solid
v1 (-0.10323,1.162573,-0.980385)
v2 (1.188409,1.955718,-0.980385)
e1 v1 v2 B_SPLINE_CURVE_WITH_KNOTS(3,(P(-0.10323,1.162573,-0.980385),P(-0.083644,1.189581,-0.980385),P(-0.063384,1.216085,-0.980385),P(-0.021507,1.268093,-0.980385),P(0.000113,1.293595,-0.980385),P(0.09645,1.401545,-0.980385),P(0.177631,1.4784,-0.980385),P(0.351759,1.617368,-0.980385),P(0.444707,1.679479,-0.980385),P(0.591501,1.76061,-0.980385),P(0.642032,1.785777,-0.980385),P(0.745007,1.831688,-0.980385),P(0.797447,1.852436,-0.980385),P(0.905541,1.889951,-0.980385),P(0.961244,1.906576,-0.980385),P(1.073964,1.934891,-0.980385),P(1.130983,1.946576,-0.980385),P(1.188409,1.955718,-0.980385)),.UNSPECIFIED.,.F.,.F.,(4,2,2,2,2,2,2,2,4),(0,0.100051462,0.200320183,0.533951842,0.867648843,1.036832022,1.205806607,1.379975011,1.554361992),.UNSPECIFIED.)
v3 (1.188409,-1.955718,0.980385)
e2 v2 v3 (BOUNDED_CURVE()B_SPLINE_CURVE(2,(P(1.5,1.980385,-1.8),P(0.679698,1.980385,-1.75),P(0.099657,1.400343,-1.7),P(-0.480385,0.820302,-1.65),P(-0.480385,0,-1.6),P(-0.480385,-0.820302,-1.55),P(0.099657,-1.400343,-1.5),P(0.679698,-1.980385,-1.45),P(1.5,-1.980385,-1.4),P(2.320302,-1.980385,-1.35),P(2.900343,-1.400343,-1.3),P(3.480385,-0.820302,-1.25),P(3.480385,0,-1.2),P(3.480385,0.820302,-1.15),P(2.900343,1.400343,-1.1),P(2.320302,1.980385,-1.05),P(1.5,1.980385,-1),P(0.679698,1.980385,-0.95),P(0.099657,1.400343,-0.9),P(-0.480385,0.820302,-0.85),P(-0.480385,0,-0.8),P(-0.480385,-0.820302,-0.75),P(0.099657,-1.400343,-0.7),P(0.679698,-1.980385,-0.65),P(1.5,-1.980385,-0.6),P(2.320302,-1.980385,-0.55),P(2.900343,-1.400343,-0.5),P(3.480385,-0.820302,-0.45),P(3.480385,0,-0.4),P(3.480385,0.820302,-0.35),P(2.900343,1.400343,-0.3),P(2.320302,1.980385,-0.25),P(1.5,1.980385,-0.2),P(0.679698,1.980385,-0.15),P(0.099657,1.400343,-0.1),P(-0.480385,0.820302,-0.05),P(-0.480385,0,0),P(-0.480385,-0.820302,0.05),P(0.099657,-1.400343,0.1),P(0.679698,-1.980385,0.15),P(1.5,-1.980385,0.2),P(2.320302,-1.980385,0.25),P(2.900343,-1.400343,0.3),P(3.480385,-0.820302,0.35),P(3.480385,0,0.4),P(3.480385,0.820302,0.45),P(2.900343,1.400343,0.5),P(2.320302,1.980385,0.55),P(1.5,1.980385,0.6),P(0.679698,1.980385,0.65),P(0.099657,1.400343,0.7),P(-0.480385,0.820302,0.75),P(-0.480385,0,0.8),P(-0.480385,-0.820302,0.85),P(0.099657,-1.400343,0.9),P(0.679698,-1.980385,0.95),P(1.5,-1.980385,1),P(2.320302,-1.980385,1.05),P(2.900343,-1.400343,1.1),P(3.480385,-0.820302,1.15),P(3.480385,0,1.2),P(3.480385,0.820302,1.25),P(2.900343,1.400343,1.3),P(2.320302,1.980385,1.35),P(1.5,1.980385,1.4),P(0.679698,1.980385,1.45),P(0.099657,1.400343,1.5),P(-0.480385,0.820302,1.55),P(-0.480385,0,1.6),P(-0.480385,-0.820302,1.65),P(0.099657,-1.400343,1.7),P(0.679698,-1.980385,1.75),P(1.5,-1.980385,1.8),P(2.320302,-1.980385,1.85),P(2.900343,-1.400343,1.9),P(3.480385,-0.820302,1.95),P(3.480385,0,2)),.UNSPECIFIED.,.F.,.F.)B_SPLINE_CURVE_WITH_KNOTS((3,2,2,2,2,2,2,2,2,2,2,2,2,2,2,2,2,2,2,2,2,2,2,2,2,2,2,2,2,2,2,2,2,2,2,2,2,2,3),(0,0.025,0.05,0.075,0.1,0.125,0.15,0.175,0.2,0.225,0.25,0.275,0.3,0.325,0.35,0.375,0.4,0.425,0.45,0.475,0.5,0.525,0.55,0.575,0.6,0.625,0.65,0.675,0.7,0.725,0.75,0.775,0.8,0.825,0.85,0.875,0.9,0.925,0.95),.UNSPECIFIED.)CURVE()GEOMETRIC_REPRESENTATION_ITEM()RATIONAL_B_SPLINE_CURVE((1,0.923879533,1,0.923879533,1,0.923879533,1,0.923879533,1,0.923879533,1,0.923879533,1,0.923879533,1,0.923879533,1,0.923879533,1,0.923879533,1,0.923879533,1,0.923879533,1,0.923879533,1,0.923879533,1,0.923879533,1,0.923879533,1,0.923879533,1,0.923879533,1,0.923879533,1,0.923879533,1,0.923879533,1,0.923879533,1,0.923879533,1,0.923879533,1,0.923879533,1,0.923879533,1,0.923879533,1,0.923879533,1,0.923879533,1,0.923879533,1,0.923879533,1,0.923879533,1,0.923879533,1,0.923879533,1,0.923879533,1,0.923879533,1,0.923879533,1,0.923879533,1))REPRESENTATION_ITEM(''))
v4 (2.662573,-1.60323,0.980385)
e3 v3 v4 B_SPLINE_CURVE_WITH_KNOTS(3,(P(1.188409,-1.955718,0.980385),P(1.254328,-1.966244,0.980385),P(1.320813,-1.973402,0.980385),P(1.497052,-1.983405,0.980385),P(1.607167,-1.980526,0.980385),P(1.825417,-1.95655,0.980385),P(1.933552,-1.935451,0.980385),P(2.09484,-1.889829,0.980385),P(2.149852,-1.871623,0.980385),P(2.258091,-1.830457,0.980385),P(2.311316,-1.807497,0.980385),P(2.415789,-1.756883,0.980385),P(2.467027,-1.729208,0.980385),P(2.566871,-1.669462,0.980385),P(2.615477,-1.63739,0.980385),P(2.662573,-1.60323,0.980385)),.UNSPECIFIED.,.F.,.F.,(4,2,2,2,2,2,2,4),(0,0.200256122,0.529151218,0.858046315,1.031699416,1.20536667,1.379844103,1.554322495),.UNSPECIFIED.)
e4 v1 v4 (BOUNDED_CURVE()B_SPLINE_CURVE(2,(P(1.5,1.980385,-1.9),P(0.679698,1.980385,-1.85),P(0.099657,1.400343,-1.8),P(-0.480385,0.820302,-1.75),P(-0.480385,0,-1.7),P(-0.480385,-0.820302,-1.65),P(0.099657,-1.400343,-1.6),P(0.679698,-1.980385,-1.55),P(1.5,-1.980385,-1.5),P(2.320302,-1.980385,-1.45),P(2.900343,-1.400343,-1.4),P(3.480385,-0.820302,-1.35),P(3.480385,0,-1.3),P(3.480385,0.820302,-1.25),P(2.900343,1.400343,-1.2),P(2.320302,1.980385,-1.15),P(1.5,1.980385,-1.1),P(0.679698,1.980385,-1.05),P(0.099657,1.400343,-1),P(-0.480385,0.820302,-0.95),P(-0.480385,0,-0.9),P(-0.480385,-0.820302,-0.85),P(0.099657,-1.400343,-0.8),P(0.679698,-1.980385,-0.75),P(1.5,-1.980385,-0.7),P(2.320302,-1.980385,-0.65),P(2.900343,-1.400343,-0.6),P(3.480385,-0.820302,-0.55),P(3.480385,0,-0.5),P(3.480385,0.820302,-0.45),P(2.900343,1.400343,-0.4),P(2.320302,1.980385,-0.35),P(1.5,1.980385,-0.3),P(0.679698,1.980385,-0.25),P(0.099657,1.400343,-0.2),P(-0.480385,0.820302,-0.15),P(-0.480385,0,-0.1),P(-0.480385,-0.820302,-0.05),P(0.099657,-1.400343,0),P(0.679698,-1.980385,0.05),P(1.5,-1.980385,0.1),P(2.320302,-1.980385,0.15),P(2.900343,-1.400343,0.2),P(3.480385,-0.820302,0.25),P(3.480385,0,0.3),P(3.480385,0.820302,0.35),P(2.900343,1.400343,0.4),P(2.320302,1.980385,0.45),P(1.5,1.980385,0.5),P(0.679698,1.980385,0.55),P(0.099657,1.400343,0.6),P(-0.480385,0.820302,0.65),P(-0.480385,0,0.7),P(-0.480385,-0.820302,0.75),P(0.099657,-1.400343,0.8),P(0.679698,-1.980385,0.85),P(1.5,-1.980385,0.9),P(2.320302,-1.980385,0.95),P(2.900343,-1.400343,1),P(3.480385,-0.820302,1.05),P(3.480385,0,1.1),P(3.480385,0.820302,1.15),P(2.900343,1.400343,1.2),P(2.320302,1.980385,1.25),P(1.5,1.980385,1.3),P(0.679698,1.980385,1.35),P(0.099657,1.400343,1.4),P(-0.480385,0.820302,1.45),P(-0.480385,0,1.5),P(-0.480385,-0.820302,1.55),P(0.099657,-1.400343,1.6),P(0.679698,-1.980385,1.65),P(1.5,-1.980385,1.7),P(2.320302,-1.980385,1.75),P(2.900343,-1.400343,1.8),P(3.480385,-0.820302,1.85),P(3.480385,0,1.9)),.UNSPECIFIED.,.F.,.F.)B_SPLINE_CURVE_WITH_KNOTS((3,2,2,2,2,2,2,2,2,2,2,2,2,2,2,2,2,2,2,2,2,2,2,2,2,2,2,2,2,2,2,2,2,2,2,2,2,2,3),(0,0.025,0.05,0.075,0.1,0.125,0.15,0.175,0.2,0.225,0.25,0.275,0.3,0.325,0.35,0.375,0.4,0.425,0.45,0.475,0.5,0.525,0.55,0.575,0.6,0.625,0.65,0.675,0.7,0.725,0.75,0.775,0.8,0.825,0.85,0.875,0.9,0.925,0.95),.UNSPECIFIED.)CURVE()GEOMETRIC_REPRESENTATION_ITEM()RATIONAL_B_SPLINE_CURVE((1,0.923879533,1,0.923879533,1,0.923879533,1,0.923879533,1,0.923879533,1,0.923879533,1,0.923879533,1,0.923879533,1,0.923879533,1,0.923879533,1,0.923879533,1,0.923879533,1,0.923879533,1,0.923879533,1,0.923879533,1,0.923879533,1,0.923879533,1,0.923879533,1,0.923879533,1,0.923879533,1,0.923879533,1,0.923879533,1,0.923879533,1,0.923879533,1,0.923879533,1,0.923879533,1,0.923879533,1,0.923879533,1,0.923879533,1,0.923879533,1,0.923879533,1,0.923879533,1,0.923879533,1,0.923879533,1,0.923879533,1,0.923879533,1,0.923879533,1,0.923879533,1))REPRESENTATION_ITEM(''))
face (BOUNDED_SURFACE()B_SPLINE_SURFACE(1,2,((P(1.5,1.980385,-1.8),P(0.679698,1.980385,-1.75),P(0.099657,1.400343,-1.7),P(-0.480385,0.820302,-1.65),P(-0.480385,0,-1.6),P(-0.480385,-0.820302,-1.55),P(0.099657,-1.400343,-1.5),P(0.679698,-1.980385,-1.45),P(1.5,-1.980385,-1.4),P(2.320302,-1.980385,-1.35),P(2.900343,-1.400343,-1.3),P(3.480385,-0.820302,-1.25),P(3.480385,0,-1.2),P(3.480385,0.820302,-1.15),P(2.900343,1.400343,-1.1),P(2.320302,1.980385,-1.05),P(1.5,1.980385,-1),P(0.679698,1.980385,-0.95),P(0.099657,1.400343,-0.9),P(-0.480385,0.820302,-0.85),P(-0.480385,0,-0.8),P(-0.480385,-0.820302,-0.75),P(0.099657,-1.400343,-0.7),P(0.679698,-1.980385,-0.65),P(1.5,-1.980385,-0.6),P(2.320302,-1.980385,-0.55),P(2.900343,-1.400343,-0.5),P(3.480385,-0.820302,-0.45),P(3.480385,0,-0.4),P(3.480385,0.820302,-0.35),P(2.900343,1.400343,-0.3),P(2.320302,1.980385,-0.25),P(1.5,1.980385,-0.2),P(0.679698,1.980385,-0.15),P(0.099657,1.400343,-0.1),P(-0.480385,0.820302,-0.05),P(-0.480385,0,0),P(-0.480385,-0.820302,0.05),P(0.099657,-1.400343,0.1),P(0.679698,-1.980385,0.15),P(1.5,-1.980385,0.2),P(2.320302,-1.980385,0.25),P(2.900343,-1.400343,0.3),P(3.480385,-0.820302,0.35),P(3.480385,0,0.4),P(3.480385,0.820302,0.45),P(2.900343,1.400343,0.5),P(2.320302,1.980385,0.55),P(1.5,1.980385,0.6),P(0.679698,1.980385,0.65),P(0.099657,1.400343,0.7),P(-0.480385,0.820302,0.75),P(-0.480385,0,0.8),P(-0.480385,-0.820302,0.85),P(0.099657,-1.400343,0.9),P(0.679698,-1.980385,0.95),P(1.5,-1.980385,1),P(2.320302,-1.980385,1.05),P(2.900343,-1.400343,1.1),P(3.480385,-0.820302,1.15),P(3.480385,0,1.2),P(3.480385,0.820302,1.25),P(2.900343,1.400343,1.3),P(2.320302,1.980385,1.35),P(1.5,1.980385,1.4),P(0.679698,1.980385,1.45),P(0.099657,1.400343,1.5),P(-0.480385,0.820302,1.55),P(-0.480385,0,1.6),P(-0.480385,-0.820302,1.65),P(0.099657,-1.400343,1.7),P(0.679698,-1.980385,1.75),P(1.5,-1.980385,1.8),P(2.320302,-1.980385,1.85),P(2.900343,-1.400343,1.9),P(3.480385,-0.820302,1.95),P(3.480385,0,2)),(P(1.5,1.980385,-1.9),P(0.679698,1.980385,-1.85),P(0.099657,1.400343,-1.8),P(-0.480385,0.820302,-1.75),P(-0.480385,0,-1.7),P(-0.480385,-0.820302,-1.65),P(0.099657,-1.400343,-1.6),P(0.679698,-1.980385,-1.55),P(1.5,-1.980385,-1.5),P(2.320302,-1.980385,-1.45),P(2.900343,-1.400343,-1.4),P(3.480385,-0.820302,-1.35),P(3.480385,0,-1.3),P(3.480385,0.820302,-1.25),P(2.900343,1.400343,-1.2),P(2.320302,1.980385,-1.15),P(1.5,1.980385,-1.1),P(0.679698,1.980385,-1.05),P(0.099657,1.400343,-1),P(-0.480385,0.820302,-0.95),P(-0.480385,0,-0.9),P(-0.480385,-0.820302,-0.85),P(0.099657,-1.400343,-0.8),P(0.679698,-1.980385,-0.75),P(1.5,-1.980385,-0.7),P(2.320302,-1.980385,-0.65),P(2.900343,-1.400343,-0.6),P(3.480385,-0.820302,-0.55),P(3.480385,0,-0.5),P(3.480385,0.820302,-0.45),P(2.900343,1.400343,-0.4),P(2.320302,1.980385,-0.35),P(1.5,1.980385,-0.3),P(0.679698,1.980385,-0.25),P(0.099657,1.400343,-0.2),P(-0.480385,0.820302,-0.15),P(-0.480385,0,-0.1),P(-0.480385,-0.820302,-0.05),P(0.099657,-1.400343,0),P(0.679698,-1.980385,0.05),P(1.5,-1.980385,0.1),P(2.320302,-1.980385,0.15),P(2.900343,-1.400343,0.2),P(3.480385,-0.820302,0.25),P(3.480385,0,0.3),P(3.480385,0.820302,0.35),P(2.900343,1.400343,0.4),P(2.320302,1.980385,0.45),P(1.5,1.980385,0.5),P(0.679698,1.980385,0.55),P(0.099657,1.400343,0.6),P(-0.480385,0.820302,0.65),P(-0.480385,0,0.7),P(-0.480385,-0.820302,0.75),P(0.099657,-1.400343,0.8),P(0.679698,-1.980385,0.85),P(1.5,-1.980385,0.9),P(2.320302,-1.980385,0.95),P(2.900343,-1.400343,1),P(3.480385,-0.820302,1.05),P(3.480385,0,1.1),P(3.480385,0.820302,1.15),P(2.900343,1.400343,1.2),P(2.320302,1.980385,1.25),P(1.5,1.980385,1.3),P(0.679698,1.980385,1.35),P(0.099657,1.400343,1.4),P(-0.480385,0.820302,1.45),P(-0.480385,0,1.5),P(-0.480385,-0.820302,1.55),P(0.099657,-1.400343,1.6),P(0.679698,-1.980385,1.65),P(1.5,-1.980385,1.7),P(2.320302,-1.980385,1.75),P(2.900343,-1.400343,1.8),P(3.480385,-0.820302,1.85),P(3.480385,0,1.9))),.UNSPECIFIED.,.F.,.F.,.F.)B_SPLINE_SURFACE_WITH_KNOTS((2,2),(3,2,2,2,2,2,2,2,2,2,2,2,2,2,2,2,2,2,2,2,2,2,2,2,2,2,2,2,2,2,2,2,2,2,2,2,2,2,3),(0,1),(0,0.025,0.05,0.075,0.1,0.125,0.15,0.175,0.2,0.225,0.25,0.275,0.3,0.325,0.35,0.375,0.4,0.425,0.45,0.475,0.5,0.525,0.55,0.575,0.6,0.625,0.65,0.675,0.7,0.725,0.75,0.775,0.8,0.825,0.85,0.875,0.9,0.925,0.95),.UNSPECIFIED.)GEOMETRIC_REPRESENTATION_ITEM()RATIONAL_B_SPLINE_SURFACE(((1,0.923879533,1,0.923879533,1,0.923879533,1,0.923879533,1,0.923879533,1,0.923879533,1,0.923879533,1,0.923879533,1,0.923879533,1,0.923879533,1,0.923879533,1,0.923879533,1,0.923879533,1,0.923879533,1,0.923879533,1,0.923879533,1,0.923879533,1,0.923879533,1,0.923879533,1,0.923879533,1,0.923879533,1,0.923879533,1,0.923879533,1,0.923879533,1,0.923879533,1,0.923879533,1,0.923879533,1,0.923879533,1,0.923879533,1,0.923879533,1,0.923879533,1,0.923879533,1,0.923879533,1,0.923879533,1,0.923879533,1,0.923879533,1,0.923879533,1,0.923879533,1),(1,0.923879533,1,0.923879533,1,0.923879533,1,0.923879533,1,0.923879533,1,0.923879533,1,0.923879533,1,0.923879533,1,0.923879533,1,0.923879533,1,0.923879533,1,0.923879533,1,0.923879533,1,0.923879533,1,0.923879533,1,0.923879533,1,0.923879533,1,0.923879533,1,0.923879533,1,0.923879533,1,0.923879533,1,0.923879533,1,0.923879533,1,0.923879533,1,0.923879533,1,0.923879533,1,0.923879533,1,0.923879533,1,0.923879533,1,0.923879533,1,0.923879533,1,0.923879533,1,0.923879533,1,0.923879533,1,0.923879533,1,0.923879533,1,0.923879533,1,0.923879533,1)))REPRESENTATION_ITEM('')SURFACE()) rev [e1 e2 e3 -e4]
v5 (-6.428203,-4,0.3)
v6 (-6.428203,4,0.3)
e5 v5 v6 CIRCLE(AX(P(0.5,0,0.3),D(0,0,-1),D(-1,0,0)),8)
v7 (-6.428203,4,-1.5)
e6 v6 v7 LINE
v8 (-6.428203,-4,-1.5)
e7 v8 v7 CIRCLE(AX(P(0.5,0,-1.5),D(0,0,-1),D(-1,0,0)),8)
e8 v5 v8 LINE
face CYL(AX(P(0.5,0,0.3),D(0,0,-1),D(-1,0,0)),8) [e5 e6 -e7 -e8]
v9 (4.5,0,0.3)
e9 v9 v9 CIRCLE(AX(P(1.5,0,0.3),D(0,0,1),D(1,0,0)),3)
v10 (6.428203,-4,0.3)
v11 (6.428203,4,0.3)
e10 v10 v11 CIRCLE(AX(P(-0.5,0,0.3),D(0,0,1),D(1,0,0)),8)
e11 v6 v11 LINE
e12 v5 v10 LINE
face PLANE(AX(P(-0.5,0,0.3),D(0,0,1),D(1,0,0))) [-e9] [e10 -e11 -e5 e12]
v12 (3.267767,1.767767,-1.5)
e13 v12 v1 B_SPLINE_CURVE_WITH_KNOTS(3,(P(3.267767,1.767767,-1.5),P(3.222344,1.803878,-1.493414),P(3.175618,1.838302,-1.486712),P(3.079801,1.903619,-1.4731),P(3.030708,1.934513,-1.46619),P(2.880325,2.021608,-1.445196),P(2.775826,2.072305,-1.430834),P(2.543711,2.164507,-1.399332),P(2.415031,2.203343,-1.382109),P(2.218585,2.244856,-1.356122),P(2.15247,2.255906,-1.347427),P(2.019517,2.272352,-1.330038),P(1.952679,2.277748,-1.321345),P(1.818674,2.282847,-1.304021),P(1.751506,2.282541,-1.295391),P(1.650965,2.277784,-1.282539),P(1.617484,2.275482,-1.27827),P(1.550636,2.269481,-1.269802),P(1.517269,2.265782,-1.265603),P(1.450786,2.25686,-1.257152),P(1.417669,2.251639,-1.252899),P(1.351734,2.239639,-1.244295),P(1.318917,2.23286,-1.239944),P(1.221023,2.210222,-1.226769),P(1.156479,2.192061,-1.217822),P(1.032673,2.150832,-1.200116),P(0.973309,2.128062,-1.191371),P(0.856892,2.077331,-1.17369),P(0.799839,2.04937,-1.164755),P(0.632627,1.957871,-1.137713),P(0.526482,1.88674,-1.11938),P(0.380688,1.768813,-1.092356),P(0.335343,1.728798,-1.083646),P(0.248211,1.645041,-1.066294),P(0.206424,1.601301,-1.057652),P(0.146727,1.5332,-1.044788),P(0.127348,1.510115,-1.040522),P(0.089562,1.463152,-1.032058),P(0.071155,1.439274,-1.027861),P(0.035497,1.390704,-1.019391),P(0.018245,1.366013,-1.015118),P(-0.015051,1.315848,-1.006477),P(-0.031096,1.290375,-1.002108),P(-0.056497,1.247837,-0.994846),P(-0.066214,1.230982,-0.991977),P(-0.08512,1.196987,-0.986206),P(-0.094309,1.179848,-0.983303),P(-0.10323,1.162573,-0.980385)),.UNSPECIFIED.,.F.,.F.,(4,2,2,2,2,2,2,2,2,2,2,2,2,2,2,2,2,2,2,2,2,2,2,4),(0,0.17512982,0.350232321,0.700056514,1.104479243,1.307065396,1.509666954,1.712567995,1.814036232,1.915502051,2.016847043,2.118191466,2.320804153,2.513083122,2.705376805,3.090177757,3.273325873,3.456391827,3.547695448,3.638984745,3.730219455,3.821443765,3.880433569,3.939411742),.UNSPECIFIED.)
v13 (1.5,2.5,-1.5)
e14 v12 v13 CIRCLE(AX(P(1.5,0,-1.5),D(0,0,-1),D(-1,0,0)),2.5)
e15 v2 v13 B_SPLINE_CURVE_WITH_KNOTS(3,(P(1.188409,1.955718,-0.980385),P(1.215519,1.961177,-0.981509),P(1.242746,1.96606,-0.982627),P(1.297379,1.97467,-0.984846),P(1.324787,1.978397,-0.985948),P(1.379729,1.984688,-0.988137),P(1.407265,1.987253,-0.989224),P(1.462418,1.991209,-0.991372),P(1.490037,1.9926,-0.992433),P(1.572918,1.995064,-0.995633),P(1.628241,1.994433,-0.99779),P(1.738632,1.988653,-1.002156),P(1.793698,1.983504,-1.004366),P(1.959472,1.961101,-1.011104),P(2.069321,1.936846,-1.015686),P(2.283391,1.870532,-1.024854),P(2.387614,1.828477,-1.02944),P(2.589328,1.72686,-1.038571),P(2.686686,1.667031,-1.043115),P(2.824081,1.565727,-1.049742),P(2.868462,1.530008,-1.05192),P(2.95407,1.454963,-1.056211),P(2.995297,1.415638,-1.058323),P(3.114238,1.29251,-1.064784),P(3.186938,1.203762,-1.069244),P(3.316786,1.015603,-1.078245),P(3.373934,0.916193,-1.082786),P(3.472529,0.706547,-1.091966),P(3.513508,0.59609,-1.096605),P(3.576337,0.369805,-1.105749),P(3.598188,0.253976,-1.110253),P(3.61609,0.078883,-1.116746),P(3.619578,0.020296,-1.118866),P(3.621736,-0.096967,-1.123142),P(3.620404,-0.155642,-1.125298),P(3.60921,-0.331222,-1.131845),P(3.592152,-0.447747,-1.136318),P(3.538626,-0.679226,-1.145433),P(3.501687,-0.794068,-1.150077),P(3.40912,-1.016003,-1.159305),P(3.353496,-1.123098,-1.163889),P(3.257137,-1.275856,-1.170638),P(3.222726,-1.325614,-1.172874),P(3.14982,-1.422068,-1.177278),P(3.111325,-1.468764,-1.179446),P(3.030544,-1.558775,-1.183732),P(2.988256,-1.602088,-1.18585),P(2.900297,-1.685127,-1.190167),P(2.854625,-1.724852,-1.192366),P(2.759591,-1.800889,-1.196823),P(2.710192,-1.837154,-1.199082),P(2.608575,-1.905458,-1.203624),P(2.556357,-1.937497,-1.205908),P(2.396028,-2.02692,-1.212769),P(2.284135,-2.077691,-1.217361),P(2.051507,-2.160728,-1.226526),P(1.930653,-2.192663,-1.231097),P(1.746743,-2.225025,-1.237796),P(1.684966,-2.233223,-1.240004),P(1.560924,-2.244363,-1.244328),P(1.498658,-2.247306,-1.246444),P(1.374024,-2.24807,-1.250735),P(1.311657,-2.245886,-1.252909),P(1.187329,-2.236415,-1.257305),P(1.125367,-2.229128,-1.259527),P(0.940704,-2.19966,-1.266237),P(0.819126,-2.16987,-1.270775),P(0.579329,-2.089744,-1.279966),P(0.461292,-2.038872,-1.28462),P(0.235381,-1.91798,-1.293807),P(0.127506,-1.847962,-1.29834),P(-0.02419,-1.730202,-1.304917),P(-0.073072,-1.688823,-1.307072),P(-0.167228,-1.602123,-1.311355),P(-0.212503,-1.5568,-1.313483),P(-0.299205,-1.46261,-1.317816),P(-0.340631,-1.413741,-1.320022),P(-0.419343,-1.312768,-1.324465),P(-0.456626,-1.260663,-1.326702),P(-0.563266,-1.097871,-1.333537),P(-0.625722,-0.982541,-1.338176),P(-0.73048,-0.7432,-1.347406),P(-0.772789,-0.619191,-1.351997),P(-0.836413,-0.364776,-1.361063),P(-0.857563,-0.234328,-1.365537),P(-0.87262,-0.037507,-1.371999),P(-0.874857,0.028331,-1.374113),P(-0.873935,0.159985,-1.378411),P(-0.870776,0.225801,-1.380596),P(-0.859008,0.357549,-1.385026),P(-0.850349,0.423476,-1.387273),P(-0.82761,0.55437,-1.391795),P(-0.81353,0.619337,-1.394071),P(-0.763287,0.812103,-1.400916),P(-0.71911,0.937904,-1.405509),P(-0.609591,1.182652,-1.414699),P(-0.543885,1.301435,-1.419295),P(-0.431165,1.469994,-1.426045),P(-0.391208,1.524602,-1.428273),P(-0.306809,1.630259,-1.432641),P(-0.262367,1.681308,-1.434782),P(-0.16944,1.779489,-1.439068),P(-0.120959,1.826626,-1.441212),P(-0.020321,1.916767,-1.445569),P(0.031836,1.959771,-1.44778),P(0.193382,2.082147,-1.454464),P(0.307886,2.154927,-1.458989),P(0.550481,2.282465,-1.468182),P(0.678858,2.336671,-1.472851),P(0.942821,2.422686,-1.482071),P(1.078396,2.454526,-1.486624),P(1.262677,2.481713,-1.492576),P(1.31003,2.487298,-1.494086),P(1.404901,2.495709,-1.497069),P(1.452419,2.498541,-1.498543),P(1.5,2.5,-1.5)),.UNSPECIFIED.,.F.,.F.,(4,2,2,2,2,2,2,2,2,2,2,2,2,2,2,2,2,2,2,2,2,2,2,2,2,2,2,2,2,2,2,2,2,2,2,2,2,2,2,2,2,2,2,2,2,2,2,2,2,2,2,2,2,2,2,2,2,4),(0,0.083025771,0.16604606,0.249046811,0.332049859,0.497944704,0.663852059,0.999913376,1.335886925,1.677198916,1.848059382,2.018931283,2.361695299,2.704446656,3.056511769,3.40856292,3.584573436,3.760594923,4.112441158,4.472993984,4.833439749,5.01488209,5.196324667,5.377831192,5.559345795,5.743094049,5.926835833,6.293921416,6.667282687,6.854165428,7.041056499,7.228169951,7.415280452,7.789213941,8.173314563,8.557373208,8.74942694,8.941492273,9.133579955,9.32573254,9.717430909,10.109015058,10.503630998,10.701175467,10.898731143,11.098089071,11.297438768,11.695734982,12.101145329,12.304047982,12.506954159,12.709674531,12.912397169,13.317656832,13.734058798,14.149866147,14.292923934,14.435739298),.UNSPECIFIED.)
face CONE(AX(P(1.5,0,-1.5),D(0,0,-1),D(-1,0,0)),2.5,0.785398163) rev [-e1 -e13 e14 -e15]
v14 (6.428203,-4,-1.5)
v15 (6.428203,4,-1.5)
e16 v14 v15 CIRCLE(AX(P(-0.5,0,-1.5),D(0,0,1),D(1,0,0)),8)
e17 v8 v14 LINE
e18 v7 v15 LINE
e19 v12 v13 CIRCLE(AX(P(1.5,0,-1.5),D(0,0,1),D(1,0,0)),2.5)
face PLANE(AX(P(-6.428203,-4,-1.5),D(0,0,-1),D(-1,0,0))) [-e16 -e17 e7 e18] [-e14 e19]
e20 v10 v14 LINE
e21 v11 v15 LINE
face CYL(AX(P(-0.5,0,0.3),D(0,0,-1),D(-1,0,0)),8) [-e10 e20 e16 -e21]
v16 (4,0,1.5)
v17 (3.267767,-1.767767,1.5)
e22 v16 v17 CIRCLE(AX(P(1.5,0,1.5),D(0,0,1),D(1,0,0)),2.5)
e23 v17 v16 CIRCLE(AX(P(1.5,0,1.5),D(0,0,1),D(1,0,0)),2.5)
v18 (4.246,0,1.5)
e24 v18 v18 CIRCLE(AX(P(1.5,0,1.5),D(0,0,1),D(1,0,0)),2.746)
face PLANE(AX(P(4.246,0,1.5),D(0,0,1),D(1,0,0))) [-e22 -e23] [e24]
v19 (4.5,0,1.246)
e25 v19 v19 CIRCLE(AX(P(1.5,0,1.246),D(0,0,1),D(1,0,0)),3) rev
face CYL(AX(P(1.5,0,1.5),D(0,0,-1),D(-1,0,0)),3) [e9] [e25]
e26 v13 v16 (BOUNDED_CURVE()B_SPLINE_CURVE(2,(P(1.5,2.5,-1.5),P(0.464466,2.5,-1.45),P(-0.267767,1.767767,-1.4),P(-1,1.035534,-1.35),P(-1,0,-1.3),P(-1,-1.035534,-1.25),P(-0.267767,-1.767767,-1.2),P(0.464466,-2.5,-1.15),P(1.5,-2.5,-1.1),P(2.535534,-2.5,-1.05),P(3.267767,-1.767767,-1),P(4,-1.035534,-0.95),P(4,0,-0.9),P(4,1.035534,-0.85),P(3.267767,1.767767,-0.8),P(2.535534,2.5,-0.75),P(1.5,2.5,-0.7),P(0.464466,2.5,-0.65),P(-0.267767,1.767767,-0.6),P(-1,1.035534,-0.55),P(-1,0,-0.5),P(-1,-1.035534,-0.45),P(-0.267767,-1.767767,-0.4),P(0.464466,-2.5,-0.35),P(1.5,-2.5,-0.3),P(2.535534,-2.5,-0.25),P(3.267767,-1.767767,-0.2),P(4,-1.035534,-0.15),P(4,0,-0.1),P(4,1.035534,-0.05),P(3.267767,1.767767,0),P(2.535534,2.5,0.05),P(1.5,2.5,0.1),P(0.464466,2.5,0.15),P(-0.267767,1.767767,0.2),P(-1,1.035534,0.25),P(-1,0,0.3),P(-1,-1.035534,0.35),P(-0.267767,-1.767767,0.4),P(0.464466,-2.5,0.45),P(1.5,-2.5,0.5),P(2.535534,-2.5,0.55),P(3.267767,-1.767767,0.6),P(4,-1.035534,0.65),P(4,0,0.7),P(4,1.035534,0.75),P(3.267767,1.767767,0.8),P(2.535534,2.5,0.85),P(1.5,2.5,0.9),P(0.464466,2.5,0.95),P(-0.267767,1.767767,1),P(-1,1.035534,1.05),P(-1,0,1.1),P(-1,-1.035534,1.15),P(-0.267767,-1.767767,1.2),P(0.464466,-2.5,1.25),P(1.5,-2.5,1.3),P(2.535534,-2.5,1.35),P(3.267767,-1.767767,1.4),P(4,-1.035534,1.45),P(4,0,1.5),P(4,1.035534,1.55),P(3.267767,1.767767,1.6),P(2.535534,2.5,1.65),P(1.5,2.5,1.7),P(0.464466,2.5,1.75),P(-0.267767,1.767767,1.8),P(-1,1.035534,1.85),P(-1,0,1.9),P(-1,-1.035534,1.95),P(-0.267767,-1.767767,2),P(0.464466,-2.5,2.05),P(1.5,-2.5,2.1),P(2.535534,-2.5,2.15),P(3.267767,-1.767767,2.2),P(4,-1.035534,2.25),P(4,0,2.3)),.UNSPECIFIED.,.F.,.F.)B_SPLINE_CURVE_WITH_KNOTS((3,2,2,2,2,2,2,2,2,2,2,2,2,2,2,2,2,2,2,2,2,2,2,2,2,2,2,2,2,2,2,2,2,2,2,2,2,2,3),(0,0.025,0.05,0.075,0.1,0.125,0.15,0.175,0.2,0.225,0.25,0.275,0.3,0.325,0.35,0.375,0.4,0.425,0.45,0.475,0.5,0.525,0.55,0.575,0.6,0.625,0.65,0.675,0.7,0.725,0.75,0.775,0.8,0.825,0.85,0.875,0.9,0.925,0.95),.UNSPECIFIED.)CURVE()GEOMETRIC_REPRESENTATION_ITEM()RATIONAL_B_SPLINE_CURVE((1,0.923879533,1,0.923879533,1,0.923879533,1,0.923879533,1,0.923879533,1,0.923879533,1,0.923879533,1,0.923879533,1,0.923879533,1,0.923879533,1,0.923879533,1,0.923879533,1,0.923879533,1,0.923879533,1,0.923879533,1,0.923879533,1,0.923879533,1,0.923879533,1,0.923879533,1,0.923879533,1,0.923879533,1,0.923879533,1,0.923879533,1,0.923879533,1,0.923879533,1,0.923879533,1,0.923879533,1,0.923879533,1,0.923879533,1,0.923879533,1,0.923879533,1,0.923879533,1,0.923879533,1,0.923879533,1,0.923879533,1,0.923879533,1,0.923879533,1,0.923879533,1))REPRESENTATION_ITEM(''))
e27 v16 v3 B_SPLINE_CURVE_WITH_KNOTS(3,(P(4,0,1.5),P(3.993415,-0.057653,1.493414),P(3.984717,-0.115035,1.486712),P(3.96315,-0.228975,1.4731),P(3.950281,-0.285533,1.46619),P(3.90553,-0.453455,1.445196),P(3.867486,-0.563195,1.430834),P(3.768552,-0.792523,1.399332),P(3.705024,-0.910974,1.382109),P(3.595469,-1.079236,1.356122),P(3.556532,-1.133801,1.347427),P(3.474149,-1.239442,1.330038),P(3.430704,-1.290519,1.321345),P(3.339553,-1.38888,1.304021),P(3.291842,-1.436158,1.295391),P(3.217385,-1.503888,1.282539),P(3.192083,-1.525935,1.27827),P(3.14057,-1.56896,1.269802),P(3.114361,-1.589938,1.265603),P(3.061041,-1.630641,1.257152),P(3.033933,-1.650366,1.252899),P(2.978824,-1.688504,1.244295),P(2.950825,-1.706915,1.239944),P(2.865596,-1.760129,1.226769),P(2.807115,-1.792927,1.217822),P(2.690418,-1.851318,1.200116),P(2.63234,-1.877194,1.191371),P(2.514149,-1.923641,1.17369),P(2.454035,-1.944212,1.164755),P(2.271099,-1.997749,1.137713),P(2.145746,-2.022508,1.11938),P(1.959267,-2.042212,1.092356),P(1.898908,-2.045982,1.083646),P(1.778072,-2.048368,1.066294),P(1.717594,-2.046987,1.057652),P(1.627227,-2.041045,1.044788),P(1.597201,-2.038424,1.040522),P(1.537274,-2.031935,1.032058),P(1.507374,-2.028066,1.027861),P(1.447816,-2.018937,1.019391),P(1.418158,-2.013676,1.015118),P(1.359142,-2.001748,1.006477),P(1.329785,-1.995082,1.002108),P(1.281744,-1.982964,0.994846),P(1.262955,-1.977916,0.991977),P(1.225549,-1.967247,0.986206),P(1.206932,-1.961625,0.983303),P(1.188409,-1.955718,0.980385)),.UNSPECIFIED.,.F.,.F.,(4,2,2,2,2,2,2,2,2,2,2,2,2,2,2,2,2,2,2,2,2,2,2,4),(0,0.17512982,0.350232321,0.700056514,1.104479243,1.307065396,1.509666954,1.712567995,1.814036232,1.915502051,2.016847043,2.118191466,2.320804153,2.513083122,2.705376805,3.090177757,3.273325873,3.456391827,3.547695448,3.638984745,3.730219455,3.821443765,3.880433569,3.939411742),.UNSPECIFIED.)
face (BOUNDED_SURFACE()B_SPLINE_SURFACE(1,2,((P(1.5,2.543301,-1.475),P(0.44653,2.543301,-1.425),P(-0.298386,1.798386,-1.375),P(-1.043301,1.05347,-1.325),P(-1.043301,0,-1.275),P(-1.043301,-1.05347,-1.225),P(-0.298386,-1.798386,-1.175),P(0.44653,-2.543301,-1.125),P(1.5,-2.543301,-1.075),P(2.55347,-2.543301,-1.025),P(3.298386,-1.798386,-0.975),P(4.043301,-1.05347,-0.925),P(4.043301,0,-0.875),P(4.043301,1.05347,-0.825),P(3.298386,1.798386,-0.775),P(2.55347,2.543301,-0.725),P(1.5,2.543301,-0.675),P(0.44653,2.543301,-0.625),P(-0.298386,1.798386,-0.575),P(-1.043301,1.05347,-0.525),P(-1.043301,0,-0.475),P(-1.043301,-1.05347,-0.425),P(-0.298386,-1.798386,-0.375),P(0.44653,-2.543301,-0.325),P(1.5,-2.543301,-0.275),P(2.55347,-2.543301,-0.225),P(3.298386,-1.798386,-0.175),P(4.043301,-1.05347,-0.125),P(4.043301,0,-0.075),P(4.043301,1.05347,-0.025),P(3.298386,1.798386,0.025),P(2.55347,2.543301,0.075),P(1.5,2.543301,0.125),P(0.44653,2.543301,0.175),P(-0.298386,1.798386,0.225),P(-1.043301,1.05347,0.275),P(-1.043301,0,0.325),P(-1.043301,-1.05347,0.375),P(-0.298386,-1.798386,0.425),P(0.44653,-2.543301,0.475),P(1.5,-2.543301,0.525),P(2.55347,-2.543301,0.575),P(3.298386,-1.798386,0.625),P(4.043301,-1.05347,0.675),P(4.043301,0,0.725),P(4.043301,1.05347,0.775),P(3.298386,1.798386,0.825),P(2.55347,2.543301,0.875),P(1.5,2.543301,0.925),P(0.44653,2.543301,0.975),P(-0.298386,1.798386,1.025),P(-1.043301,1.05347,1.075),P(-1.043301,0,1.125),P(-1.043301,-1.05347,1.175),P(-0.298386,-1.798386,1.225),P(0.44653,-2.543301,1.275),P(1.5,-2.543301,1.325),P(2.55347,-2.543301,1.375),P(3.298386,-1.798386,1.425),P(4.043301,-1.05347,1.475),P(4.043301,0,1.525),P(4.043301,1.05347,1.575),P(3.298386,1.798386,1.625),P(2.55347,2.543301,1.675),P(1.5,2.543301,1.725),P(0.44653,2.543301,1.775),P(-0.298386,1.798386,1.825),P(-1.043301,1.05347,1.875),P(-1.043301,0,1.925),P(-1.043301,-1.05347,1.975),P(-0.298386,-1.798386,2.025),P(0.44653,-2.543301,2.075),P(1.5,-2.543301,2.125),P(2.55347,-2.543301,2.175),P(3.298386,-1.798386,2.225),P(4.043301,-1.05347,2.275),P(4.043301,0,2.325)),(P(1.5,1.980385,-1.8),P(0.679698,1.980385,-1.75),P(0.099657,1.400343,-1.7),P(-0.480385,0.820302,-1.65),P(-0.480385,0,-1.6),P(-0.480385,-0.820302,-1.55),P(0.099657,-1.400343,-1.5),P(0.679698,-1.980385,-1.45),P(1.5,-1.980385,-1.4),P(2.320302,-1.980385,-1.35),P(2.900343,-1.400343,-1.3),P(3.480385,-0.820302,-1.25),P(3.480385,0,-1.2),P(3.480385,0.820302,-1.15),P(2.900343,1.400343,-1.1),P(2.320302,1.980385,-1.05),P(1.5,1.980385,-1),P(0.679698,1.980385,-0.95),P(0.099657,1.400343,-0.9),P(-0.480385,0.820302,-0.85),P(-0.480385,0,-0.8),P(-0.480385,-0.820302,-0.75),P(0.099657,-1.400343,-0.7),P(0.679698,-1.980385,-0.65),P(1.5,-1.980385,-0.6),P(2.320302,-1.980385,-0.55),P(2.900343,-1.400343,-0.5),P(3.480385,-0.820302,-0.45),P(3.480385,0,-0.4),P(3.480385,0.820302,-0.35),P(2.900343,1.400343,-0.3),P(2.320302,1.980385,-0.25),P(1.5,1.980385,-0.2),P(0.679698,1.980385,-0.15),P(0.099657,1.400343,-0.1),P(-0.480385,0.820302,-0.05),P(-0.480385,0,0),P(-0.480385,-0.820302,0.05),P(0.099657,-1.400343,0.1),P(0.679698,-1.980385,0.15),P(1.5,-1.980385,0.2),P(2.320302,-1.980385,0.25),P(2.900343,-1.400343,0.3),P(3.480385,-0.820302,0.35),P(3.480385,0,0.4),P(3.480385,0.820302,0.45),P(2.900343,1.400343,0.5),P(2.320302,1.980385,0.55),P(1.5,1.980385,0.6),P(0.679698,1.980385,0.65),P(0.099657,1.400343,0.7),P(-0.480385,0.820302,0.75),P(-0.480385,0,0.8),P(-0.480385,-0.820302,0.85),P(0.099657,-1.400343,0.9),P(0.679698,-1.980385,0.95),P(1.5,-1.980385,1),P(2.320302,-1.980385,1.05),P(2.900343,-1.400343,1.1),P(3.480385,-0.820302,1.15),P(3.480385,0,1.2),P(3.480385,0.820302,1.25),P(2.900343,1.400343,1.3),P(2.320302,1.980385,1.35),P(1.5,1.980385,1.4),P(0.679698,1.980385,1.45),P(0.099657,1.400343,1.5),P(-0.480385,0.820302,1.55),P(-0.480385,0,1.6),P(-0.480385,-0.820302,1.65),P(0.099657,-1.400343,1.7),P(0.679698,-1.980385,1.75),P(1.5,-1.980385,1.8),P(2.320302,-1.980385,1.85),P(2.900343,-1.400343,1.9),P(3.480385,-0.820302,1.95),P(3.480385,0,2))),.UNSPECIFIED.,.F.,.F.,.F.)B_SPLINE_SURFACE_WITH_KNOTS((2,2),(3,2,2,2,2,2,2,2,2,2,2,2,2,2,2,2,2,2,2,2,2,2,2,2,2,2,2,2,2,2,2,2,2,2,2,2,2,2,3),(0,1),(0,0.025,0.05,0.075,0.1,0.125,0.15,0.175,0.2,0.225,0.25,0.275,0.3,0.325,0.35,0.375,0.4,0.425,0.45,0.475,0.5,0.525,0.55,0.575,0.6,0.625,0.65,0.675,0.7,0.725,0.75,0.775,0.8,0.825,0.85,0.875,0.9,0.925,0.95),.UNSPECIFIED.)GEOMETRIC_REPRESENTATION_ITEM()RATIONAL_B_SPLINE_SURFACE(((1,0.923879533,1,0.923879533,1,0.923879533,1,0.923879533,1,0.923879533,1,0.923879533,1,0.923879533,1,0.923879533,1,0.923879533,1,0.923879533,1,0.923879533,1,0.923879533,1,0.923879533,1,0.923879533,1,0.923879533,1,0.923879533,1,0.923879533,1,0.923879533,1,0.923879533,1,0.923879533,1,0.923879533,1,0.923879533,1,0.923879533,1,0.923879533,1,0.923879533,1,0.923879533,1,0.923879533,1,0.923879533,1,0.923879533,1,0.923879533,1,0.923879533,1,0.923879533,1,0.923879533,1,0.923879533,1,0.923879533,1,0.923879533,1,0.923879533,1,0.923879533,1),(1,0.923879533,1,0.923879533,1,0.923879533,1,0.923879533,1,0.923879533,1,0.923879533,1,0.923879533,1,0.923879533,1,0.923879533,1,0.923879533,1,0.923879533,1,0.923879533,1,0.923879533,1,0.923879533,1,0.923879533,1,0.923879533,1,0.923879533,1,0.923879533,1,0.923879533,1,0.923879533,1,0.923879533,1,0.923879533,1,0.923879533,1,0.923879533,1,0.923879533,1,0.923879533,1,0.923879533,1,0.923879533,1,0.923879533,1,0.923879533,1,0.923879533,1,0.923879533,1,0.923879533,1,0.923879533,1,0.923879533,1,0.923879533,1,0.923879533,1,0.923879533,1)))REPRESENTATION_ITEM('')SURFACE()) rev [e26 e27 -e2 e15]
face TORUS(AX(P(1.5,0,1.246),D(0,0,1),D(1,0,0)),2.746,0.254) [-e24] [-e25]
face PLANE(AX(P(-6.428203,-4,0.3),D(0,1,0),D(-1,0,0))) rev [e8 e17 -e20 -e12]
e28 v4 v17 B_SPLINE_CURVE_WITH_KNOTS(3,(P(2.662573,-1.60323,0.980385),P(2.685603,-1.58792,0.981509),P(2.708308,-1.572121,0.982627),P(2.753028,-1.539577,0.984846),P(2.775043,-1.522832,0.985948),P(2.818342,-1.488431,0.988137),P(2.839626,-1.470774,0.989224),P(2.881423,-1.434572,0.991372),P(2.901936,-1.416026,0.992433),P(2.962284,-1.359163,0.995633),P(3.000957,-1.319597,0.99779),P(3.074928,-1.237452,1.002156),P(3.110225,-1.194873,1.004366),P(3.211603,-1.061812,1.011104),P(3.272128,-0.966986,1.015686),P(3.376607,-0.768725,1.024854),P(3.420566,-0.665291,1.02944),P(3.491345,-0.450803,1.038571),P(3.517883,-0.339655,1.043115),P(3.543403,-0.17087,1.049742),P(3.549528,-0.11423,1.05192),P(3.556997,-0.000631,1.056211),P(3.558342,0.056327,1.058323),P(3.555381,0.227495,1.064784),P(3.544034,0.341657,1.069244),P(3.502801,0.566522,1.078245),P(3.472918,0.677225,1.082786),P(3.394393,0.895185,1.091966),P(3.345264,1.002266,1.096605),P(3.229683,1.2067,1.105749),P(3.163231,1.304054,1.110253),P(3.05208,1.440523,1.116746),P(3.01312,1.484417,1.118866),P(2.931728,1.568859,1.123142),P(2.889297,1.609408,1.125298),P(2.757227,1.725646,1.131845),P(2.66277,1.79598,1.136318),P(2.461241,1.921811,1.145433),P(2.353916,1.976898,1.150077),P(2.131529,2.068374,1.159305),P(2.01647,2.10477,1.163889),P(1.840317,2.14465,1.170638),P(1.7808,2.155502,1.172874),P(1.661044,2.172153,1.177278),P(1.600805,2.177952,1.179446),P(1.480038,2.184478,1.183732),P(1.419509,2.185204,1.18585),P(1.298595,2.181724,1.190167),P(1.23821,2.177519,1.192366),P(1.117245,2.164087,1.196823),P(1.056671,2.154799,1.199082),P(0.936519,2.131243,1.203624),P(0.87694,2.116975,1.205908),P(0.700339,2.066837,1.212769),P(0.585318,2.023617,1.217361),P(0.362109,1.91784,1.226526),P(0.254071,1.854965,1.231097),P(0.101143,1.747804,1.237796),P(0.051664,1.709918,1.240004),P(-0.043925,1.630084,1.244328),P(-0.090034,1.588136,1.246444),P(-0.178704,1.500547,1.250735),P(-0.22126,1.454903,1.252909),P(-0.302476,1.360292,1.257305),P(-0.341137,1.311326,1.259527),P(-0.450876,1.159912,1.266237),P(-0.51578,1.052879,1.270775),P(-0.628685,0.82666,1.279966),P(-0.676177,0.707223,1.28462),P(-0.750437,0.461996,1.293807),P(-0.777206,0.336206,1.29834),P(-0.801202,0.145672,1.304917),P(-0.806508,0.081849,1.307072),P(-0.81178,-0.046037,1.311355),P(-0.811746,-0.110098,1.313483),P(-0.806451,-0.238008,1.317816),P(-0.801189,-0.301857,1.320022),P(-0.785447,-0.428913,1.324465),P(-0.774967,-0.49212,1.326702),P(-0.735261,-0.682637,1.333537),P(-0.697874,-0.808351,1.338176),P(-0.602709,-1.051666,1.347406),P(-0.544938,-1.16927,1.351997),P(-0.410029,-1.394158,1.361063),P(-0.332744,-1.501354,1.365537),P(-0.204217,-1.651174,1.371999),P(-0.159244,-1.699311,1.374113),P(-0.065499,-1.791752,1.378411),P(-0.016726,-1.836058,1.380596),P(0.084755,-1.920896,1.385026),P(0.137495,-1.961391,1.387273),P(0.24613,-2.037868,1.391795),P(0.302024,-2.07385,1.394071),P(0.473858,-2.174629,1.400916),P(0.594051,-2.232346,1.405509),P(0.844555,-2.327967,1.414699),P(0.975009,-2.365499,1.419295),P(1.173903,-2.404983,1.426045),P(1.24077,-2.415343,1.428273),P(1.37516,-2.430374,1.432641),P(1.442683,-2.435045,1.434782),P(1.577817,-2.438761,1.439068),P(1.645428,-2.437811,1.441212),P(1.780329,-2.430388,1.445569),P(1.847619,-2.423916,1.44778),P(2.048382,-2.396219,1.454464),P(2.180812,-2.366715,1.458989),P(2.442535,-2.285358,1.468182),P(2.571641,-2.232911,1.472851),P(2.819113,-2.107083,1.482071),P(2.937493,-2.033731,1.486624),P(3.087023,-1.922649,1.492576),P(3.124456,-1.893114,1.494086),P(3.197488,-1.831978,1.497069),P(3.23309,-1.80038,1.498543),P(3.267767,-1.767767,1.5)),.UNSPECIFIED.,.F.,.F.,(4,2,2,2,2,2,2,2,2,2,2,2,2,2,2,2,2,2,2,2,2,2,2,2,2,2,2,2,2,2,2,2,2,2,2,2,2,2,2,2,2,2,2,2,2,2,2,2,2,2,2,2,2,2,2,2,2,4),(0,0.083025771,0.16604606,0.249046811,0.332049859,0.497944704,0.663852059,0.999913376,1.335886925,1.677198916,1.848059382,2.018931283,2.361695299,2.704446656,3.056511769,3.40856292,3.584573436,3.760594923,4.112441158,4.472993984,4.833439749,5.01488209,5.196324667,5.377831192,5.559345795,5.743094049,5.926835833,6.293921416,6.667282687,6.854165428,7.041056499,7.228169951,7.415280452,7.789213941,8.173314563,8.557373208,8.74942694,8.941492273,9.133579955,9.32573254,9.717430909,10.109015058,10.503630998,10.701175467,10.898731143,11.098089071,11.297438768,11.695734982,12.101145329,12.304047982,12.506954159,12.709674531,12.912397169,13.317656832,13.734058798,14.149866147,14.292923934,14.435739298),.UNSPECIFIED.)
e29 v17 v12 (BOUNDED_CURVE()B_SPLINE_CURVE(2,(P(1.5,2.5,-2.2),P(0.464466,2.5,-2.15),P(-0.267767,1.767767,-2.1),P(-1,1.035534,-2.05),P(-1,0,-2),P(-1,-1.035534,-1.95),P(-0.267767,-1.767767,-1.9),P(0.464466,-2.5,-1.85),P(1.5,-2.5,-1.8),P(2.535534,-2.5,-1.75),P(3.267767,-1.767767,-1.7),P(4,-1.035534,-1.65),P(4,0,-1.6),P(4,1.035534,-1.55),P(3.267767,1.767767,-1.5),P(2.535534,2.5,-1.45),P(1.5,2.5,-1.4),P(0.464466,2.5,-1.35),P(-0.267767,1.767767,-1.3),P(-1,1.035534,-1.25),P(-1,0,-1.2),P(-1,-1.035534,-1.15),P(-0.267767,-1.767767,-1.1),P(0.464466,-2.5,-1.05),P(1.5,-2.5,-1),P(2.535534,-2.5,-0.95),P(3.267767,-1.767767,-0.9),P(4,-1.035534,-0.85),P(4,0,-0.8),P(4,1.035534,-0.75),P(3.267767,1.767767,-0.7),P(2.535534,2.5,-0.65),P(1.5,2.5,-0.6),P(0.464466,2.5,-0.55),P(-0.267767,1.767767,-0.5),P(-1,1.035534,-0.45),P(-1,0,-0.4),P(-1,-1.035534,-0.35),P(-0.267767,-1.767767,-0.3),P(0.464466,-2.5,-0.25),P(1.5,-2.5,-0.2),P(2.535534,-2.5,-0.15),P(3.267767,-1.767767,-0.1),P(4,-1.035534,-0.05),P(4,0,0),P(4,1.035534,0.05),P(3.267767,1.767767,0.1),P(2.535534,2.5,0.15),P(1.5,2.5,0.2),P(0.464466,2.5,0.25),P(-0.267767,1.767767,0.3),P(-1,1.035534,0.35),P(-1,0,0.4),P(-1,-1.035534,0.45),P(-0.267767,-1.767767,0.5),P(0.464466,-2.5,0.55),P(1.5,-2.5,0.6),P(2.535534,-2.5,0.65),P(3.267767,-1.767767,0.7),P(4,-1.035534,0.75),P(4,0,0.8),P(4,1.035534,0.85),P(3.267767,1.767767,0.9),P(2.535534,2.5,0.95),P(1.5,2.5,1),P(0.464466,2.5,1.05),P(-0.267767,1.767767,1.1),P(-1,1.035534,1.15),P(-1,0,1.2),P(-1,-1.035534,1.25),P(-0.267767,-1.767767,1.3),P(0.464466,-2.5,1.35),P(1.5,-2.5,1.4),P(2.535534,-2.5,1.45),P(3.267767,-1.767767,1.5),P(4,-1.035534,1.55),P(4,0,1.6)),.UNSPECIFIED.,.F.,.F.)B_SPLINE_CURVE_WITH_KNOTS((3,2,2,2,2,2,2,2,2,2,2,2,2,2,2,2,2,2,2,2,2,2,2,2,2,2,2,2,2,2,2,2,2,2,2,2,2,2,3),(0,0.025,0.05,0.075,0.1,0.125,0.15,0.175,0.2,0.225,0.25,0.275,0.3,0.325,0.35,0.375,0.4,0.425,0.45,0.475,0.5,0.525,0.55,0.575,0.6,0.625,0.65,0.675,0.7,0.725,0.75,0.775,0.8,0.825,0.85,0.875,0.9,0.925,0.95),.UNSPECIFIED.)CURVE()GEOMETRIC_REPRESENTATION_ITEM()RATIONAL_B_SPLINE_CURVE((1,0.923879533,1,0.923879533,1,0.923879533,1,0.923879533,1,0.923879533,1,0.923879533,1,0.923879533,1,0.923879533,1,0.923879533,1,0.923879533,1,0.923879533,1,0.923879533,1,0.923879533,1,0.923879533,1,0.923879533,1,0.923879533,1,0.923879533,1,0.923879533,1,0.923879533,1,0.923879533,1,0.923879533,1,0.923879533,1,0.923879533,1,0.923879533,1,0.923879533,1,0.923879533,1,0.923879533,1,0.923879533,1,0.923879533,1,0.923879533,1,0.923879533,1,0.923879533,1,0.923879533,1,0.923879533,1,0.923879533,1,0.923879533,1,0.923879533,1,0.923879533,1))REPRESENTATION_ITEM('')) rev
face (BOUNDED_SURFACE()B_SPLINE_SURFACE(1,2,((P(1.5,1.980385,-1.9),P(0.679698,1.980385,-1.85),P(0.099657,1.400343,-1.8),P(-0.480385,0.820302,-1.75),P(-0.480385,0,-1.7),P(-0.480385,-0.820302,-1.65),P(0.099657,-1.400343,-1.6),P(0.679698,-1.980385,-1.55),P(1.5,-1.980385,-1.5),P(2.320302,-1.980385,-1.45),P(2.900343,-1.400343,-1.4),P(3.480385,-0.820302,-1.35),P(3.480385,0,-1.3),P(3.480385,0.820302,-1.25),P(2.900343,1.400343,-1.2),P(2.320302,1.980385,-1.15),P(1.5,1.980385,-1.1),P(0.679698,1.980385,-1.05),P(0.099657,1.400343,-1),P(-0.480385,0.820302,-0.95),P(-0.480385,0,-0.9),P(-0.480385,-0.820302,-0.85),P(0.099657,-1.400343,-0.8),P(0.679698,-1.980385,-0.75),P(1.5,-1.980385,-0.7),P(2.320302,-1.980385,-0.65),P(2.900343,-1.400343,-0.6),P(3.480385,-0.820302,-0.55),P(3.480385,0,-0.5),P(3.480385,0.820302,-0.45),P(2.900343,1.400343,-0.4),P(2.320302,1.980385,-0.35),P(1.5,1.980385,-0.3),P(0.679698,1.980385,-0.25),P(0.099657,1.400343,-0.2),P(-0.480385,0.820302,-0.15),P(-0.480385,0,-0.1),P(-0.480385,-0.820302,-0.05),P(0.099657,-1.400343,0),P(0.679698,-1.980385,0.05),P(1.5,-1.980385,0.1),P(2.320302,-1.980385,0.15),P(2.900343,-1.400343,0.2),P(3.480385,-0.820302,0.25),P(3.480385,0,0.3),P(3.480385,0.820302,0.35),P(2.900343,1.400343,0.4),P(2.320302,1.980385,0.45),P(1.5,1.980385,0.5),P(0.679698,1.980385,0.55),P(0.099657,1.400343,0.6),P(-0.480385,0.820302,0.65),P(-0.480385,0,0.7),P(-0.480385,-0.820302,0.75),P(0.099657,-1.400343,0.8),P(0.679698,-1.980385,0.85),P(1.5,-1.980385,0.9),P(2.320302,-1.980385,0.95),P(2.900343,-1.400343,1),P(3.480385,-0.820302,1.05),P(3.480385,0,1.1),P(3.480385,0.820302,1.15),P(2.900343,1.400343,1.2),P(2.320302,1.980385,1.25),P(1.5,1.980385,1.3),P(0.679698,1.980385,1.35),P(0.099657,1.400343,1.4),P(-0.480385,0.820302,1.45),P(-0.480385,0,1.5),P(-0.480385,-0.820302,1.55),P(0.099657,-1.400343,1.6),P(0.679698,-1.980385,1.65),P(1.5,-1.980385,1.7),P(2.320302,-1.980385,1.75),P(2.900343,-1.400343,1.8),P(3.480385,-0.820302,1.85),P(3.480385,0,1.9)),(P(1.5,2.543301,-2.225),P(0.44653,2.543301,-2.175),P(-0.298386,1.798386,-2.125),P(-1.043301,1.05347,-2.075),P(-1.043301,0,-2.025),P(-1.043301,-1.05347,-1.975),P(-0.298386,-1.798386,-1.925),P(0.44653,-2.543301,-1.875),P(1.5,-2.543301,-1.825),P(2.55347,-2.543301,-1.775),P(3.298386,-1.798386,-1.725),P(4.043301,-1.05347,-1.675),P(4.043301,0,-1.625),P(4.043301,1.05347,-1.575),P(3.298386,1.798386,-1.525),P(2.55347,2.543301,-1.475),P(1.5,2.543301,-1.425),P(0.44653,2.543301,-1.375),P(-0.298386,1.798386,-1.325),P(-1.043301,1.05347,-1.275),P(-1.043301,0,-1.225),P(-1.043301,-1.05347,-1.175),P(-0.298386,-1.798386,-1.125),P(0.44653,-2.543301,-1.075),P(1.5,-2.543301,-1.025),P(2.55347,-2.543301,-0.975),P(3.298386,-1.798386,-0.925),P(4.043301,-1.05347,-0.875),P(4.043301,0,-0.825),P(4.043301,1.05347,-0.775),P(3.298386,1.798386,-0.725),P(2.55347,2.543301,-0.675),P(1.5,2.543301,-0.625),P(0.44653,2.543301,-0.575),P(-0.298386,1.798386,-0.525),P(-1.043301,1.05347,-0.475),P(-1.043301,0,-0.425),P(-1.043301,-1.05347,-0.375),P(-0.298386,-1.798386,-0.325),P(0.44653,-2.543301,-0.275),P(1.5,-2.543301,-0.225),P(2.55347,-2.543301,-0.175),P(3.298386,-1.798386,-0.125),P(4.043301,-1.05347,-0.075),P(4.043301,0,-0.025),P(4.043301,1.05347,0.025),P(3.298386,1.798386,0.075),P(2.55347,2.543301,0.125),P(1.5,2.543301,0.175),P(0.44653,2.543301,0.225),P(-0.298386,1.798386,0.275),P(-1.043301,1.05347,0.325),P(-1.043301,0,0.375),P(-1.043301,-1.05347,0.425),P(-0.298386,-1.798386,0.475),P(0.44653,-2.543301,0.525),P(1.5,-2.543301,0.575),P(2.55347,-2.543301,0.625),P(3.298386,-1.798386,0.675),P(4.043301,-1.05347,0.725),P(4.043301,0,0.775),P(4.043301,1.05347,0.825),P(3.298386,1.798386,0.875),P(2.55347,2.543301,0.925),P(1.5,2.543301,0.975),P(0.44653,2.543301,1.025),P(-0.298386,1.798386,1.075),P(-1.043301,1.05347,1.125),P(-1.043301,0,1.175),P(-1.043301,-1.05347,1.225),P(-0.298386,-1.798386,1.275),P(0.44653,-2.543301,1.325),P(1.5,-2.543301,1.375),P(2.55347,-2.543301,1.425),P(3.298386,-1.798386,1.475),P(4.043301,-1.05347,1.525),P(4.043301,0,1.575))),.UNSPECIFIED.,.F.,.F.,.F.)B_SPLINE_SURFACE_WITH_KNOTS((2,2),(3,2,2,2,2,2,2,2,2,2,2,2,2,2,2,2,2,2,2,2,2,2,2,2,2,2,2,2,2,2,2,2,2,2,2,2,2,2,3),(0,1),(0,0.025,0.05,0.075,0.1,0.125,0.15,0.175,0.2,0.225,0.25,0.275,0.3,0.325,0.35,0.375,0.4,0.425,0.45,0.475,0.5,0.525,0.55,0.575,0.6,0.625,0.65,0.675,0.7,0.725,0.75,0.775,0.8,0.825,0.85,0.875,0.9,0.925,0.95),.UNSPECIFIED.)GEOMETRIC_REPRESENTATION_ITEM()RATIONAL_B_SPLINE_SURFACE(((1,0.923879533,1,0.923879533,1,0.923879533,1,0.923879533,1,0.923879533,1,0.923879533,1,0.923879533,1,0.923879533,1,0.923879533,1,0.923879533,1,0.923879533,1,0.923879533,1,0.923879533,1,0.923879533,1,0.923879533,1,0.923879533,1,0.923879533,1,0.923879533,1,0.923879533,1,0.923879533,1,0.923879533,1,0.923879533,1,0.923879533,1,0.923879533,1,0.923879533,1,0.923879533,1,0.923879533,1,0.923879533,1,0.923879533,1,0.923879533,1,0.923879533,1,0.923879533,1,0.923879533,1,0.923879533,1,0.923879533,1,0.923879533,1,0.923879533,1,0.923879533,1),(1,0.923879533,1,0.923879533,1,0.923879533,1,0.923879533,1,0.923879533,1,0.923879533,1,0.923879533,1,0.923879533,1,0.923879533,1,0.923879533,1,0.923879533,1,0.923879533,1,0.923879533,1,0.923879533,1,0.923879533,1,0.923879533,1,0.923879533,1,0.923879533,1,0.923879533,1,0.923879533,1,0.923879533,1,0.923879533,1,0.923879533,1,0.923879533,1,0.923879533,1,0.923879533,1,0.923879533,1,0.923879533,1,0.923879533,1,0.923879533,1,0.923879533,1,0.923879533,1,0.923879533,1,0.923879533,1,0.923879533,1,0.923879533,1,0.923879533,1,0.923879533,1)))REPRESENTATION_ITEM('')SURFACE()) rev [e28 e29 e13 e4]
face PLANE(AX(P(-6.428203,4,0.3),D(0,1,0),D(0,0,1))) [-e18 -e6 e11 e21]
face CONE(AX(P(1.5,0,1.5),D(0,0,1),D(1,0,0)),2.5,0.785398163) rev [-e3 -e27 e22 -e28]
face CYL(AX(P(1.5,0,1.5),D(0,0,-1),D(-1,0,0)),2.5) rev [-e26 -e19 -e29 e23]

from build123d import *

# Parameters (mm, degrees)
BOSS_EXTRUDE1_START     = -1.5
BOSS_EXTRUDE1_DEPTH     = 1.8
SKETCH8_R               = 3
SKETCH8_R_2             = 2.5
BOSS_EXTRUDE2_DEPTH     = 1.2
CUT_EXTRUDE1_DEPTH      = 9.631338251
CUT_EXTRUDE1_DEPTH_BACK = 9.631338251
SKETCH9_R               = 2.5
FILLET1_R               = 0.254
SWEEP1_PITCH            = 0.8
SPLIT1_START            = -2.7460001
SPLIT1_OUTLINE_W        = 9
SPLIT1_OUTLINE_H        = 2.5
SPLIT1_DEPTH            = 5.4920002


with BuildPart() as part:
    # Sketch7 → Boss-Extrude1 (new body)
    with BuildSketch(Plane.XY.offset(BOSS_EXTRUDE1_START)):
        with BuildLine():
            Line((-6.42820323, 4), (6.42820323, 4))
            ThreePointArc((6.42820323, 4), (7.5, 0), (6.42820323, -4))
            Line((6.42820323, -4), (-6.42820323, -4))
            ThreePointArc((-6.42820323, -4), (-7.5, 0), (-6.42820323, 4))
        make_face()
    extrude(amount=BOSS_EXTRUDE1_DEPTH)

    # Sketch8 → Boss-Extrude2 (add)
    with BuildSketch(Plane.XY.offset(0.3)):
        with Locations((1.5, 0)):
            Circle(SKETCH8_R)
        with Locations((1.5, 0)):
            Circle(SKETCH8_R_2, mode=Mode.SUBTRACT)
    extrude(amount=BOSS_EXTRUDE2_DEPTH)

    # Sketch9 → Cut-Extrude1 (cut, two sides: drawn at the far end of the back side and taken through both)
    with BuildSketch(Plane.XY.offset(-CUT_EXTRUDE1_DEPTH_BACK)):
        with Locations((1.5, 0)):
            Circle(SKETCH9_R)
    extrude(amount=CUT_EXTRUDE1_DEPTH + CUT_EXTRUDE1_DEPTH_BACK, mode=Mode.SUBTRACT)

    # Fillet1
    fillet1_edges = [part.edges().sort_by_distance(p)[0] for p in [
        (-1.5, 0, 1.5),
    ]]
    fillet(fillet1_edges, radius=FILLET1_R)

    # Sweep1: arcs per turn and ends read off the stored shape
    # Sweep1: the profile of Sketch3 screwed along a right-hand helix through 4.75 turns, 8 arcs to a turn; built about Z, then put on its axis
    sweep1_z = Axis((0, 0, 0), (0, 0, 1))
    sweep1_corners = [(2.54330127, 0, 0.025), (2.54330127, 0, -0.725), (1.980384758, 0, -0.4), (1.980384758, 0, -0.3)]
    with BuildLine(mode=Mode.PRIVATE) as sweep1_profile:
        Line(sweep1_corners[0], sweep1_corners[1])
        Line(sweep1_corners[1], sweep1_corners[2])
        Line(sweep1_corners[2], sweep1_corners[3])
        Line(sweep1_corners[3], sweep1_corners[0])
    sweep1_cap = Face(sweep1_profile.wire())
    sweep1_turn_angles = [0, 22.5, 45, 67.5, 90, 112.5, 135, 157.5, 180, 202.5, 225, 247.5, 270, 292.5, 315, 337.5, 360]
    sweep1_turn_weights = [1, 0.9238795325112867, 1, 0.9238795325112867, 1, 0.9238795325112867, 1, 0.9238795325112867, 1, 0.9238795325112867, 1, 0.9238795325112867, 1, 0.9238795325112867, 1, 0.9238795325112867, 1]
    sweep1_turn_rails = [Edge.make_bspline([Vector(p[0], p[1], 0).rotate(sweep1_z, sweep1_turn_angles[k]) / sweep1_turn_weights[k] + Vector(0, 0, p[2] + SWEEP1_PITCH * sweep1_turn_angles[k] / 360) for k in range(17)], [0, 0, 0, 1, 1, 2, 2, 3, 3, 4, 4, 5, 5, 6, 6, 7, 7, 8, 8, 8], 2, sweep1_turn_weights) for p in sweep1_corners]
    sweep1_turn_sides = [Face.make_surface_from_curves(sweep1_turn_rails[p[0]], sweep1_turn_rails[p[1]]) for p in [(0, 1), (1, 2), (2, 3), (3, 0)]]
    sweep1_last_angles = [1440, 1462.5, 1485, 1507.5, 1530, 1552.5, 1575, 1597.5, 1620, 1642.5, 1665, 1687.5, 1710]
    sweep1_last_weights = [1, 0.9238795325112867, 1, 0.9238795325112867, 1, 0.9238795325112867, 1, 0.9238795325112867, 1, 0.9238795325112867, 1, 0.9238795325112776, 1]
    sweep1_last_rails = [Edge.make_bspline([Vector(p[0], p[1], 0).rotate(sweep1_z, sweep1_last_angles[k]) / sweep1_last_weights[k] + Vector(0, 0, p[2] + SWEEP1_PITCH * sweep1_last_angles[k] / 360) for k in range(13)], [0, 0, 0, 1, 1, 2, 2, 3, 3, 4, 4, 5, 5, 6, 6, 6], 2, sweep1_last_weights) for p in sweep1_corners]
    sweep1_last_sides = [Face.make_surface_from_curves(sweep1_last_rails[p[0]], sweep1_last_rails[p[1]]) for p in [(0, 1), (1, 2), (2, 3), (3, 0)]]
    sweep1 = Plane(origin=(1.5, 0, -1.5), x_dir=(0, 1, 0), z_dir=(0, 0, 1)) * Solid(Shell([*[p.moved(Location((0, 0, SWEEP1_PITCH * i))) for i in range(4) for p in sweep1_turn_sides], *sweep1_last_sides, sweep1_cap, sweep1_cap.rotate(sweep1_z, 1710).moved(Location((0, 0, SWEEP1_PITCH * 1710 / 360)))]))
    add(sweep1)

    # Split1: read off the stored shape, not the designer's step
    # Split1 outline → Split1 (cut)
    with BuildSketch(Plane(origin=(0, 0, 0), x_dir=(1, 0, 0), z_dir=(0, 1, 0)).offset(SPLIT1_START)):
        with Locations((1.5, -2.75)):
            Rectangle(SPLIT1_OUTLINE_W, SPLIT1_OUTLINE_H)
        with Locations((1.5, 2.75)):
            Rectangle(SPLIT1_OUTLINE_W, SPLIT1_OUTLINE_H)
    extrude(amount=SPLIT1_DEPTH, mode=Mode.SUBTRACT)

    # Cut-Extrude2 cone 1 section (through the dimple's axis) → Cut-Extrude2 (revolve, cut)
    with BuildSketch(Plane(origin=(1.5, 0, -1.5), x_dir=(0, 1, 0), z_dir=(1, 0, 0))):
        Polygon((0, 0), (2.5, 0), (0, 2.5), align=None)
    revolve(axis=Axis((1.5, 0, -1.5), (0, 0, 1)), mode=Mode.SUBTRACT)

    # Cut-Extrude3 cone 1 section (through the dimple's axis) → Cut-Extrude3 (revolve, cut)
    with BuildSketch(Plane(origin=(1.5, 0, 1.5), x_dir=(0, -1, 0), z_dir=(1, 0, 0))):
        Polygon((0, 0), (2.5, 0), (0, 2.5), align=None)
    revolve(axis=Axis((1.5, 0, 1.5), (0, 0, -1)), mode=Mode.SUBTRACT)


solid = part.part
